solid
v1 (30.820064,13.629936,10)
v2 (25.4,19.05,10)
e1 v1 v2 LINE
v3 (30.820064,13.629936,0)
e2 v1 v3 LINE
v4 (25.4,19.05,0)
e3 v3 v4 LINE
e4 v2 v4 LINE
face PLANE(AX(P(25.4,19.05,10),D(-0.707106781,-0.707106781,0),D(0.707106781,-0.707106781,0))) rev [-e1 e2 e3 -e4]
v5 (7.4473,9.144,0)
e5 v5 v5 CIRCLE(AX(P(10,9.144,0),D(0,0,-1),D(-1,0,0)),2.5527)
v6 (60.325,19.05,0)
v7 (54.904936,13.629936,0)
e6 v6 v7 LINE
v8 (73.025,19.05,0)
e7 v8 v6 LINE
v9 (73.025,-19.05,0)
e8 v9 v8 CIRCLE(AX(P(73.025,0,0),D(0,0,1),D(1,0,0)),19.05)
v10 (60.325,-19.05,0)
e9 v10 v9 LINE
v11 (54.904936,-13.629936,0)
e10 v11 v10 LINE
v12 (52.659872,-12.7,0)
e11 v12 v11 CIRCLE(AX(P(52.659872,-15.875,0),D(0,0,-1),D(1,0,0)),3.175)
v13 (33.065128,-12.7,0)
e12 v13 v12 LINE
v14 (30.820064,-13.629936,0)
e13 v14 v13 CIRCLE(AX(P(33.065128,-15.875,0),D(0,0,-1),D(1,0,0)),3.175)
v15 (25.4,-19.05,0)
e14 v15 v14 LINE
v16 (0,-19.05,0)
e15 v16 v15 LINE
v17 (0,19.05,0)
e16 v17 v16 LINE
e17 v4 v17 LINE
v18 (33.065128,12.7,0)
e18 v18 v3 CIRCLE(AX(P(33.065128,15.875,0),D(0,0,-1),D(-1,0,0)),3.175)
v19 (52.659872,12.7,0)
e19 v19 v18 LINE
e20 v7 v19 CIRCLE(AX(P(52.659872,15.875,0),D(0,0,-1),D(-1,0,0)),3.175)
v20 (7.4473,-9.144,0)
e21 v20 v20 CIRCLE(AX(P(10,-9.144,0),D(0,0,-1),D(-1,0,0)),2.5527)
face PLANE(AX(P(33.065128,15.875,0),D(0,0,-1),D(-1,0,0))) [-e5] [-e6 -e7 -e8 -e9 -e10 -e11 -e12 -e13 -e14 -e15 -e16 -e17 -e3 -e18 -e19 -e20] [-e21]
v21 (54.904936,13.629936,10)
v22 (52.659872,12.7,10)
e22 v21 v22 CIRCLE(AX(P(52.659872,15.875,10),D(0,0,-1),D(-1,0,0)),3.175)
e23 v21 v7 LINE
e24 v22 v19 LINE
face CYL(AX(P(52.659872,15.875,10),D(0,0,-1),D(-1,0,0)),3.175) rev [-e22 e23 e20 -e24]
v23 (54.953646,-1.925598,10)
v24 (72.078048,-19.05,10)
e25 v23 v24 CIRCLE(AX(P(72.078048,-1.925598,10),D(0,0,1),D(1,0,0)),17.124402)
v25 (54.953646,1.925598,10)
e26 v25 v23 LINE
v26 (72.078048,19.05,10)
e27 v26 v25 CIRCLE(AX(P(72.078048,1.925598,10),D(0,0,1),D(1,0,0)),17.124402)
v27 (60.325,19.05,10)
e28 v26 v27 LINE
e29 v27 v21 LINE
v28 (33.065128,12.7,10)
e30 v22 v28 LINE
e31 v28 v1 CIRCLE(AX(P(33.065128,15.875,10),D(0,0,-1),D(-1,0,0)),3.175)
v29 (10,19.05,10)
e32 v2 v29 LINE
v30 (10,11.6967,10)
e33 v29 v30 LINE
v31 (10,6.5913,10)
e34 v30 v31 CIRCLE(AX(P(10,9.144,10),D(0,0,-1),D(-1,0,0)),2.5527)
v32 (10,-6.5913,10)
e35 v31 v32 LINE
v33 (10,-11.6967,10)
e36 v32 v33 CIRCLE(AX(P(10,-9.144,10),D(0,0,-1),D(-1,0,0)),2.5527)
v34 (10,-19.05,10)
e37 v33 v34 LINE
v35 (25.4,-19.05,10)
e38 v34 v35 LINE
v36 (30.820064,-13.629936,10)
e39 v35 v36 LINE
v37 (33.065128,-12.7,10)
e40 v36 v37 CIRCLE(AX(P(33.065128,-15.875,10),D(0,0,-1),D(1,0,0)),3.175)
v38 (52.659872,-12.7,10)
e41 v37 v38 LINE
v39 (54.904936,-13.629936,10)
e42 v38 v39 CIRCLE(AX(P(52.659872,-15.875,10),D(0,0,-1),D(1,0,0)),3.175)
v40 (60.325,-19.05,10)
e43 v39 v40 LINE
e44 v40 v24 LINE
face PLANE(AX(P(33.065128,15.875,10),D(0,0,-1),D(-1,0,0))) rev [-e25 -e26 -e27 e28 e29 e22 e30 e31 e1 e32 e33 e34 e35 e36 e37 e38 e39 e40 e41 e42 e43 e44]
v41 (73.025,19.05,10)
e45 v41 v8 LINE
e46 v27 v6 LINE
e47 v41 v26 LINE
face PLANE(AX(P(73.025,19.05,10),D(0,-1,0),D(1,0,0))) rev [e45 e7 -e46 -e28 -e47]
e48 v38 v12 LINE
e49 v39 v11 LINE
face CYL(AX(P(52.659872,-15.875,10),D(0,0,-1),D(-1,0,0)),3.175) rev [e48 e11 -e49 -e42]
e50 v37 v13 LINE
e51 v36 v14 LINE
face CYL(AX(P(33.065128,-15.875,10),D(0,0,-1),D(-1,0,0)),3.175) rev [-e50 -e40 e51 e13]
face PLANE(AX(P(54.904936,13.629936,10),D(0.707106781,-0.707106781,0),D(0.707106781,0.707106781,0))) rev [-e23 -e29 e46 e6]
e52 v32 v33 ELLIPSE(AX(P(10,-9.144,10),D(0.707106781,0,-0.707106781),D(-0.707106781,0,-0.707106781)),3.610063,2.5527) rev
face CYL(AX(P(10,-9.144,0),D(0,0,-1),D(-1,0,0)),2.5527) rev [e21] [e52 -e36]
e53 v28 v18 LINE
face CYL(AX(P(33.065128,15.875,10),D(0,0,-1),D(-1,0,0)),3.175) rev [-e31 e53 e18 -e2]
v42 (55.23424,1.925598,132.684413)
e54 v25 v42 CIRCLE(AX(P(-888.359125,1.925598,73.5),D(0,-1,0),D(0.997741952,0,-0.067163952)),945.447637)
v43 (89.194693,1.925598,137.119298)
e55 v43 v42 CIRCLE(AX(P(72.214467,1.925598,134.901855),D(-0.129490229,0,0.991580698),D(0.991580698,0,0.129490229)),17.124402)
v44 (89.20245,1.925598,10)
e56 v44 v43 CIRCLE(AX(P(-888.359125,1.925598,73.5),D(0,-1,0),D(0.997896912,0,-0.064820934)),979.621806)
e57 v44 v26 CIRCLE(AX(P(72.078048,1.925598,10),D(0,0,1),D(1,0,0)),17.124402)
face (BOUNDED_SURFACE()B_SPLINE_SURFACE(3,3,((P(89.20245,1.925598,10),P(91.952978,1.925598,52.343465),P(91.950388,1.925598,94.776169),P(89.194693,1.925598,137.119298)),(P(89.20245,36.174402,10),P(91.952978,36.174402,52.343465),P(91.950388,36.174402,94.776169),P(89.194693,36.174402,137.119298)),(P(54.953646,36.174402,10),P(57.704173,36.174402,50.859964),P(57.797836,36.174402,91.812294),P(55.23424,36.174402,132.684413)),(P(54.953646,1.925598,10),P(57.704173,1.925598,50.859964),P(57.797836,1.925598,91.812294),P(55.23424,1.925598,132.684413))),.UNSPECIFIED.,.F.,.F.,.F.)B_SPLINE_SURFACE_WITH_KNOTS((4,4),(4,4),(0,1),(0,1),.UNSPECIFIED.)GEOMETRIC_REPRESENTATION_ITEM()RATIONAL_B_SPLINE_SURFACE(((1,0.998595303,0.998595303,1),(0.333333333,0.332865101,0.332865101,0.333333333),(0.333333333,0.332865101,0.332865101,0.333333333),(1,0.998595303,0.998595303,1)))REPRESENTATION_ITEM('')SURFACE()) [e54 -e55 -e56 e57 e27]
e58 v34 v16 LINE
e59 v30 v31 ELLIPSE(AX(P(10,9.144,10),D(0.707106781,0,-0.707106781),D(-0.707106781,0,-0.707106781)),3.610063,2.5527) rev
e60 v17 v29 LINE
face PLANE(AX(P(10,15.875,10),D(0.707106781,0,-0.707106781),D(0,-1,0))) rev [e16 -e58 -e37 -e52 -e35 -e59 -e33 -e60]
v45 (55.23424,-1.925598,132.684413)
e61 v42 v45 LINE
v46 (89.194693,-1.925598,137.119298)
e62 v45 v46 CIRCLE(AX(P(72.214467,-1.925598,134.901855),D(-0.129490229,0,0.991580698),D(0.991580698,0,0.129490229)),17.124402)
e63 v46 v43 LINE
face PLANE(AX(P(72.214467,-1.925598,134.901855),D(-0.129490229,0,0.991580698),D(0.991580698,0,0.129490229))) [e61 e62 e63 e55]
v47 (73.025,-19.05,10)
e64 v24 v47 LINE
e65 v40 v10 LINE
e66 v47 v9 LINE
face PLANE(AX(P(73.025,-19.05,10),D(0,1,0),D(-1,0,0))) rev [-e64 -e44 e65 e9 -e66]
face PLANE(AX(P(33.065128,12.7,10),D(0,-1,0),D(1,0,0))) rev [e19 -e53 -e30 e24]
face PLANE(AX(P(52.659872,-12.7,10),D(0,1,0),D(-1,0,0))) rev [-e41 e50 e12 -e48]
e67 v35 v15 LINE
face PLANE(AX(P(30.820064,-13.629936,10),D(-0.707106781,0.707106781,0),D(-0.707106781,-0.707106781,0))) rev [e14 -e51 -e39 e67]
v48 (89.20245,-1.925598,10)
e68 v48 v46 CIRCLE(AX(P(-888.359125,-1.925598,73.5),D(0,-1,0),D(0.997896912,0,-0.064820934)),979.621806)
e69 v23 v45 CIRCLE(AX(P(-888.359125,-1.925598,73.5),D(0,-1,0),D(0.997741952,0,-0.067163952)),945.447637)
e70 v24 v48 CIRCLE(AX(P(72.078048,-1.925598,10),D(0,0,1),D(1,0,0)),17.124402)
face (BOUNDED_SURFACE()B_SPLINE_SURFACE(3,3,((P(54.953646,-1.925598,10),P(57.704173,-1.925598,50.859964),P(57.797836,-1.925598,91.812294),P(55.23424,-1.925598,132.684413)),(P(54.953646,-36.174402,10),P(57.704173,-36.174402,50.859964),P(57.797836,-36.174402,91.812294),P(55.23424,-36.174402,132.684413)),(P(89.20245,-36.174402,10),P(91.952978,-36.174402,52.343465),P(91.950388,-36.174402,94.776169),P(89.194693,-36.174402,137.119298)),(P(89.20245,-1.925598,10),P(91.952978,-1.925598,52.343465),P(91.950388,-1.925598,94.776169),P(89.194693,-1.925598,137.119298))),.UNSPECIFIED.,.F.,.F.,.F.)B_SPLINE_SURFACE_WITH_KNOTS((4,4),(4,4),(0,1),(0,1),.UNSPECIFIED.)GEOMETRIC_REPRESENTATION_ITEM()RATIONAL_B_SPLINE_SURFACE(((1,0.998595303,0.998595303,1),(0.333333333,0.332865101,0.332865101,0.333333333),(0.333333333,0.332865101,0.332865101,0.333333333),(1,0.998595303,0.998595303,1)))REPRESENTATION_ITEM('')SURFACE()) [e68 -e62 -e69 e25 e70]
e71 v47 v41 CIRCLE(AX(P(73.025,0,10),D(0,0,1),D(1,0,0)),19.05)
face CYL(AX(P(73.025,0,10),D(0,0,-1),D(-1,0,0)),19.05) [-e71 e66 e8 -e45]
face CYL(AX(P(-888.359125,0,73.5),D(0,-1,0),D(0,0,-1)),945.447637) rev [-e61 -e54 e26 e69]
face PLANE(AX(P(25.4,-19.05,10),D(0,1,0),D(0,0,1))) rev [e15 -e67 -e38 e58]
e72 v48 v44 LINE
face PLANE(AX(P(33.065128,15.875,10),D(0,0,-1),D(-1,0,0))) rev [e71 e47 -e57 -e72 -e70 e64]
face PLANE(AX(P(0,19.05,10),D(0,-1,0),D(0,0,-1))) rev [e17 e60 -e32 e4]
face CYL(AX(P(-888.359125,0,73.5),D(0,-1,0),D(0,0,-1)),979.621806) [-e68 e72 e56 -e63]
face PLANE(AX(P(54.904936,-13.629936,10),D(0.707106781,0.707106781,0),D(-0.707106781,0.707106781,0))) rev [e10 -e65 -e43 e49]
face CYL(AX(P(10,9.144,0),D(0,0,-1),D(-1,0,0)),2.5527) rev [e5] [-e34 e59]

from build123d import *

# Parameters (mm, degrees)
BOSS_EXTRUDE1_DEPTH         = 10
CHAMFER1_SIZE               = 10
F_1_4_20_TAPPED_HOLE1_D     = 5.1054
F_1_4_20_TAPPED_HOLE1_DEPTH = 16.51


with BuildPart() as part:
    # Sketch1 → Boss-Extrude1 (new body)
    with BuildSketch(Plane.XY):
        with BuildLine():
            Line((0, -19.05), (0, 19.05))
            Line((0, 19.05), (25.4, 19.05))
            Line((25.4, 19.05), (30.82006403, 13.62993597))
            ThreePointArc((30.82006403, 13.62993597), (31.850108163, 12.941682484), (33.065128061, 12.7))
            Line((33.065128061, 12.7), (52.659871939, 12.7))
            ThreePointArc((52.659871939, 12.7), (53.874891837, 12.941682484), (54.90493597, 13.62993597))
            Line((54.90493597, 13.62993597), (60.325, 19.05))
            Line((60.325, 19.05), (73.025, 19.05))
            ThreePointArc((73.025, 19.05), (92.075, 0), (73.025, -19.05))
            Line((73.025, -19.05), (60.325, -19.05))
            Line((60.325, -19.05), (54.90493597, -13.62993597))
            ThreePointArc((54.90493597, -13.62993597), (53.874891837, -12.941682484), (52.659871939, -12.7))
            Line((52.659871939, -12.7), (33.065128061, -12.7))
            ThreePointArc((33.065128061, -12.7), (31.850108163, -12.941682484), (30.82006403, -13.62993597))
            Line((30.82006403, -13.62993597), (25.4, -19.05))
            Line((25.4, -19.05), (0, -19.05))
        make_face()
    extrude(amount=BOSS_EXTRUDE1_DEPTH)

    # Chamfer1
    chamfer1_edges = [part.edges().sort_by_distance(p)[0] for p in [
        (0, 0, 10),
    ]]
    chamfer(chamfer1_edges, length=CHAMFER1_SIZE - 0.0001)  # a hair under: the kernel refuses the full size

    # 1/4-20 Tapped Hole1
    with Locations(Plane(origin=(0, 0, 0), x_dir=(-1, 0, 0), z_dir=(0, 0, -1))):
        with Locations((-10, -9.144), (-10, 9.144)):
            Hole(F_1_4_20_TAPPED_HOLE1_D / 2, depth=F_1_4_20_TAPPED_HOLE1_DEPTH)

    # Sweep1: sweep along a path in Sketch8
    with BuildLine(Plane(origin=(0, 0, 0), x_dir=(1, 0, 0), z_dir=(0, 1, 0))) as sweep1_path:
        ThreePointArc((88.281159976, -10), (90.343330416, -73.5), (88.281159976, -137))
    # Sketch5 → Sweep1 (sweep)
    with BuildSketch(Plane.XY.offset(10)):
        with BuildLine():
            Line((89.202450062, -1.925597754), (89.202450062, 1.925597754))
            ThreePointArc((89.202450062, 1.925597754), (72.078047816, 19.05), (54.953645569, 1.925597754))
            Line((54.953645569, 1.925597754), (54.953645569, -1.925597754))
            ThreePointArc((54.953645569, -1.925597754), (72.078047816, -19.05), (89.202450062, -1.925597754))
        make_face()
    sweep(path=sweep1_path.line)


solid = part.part
